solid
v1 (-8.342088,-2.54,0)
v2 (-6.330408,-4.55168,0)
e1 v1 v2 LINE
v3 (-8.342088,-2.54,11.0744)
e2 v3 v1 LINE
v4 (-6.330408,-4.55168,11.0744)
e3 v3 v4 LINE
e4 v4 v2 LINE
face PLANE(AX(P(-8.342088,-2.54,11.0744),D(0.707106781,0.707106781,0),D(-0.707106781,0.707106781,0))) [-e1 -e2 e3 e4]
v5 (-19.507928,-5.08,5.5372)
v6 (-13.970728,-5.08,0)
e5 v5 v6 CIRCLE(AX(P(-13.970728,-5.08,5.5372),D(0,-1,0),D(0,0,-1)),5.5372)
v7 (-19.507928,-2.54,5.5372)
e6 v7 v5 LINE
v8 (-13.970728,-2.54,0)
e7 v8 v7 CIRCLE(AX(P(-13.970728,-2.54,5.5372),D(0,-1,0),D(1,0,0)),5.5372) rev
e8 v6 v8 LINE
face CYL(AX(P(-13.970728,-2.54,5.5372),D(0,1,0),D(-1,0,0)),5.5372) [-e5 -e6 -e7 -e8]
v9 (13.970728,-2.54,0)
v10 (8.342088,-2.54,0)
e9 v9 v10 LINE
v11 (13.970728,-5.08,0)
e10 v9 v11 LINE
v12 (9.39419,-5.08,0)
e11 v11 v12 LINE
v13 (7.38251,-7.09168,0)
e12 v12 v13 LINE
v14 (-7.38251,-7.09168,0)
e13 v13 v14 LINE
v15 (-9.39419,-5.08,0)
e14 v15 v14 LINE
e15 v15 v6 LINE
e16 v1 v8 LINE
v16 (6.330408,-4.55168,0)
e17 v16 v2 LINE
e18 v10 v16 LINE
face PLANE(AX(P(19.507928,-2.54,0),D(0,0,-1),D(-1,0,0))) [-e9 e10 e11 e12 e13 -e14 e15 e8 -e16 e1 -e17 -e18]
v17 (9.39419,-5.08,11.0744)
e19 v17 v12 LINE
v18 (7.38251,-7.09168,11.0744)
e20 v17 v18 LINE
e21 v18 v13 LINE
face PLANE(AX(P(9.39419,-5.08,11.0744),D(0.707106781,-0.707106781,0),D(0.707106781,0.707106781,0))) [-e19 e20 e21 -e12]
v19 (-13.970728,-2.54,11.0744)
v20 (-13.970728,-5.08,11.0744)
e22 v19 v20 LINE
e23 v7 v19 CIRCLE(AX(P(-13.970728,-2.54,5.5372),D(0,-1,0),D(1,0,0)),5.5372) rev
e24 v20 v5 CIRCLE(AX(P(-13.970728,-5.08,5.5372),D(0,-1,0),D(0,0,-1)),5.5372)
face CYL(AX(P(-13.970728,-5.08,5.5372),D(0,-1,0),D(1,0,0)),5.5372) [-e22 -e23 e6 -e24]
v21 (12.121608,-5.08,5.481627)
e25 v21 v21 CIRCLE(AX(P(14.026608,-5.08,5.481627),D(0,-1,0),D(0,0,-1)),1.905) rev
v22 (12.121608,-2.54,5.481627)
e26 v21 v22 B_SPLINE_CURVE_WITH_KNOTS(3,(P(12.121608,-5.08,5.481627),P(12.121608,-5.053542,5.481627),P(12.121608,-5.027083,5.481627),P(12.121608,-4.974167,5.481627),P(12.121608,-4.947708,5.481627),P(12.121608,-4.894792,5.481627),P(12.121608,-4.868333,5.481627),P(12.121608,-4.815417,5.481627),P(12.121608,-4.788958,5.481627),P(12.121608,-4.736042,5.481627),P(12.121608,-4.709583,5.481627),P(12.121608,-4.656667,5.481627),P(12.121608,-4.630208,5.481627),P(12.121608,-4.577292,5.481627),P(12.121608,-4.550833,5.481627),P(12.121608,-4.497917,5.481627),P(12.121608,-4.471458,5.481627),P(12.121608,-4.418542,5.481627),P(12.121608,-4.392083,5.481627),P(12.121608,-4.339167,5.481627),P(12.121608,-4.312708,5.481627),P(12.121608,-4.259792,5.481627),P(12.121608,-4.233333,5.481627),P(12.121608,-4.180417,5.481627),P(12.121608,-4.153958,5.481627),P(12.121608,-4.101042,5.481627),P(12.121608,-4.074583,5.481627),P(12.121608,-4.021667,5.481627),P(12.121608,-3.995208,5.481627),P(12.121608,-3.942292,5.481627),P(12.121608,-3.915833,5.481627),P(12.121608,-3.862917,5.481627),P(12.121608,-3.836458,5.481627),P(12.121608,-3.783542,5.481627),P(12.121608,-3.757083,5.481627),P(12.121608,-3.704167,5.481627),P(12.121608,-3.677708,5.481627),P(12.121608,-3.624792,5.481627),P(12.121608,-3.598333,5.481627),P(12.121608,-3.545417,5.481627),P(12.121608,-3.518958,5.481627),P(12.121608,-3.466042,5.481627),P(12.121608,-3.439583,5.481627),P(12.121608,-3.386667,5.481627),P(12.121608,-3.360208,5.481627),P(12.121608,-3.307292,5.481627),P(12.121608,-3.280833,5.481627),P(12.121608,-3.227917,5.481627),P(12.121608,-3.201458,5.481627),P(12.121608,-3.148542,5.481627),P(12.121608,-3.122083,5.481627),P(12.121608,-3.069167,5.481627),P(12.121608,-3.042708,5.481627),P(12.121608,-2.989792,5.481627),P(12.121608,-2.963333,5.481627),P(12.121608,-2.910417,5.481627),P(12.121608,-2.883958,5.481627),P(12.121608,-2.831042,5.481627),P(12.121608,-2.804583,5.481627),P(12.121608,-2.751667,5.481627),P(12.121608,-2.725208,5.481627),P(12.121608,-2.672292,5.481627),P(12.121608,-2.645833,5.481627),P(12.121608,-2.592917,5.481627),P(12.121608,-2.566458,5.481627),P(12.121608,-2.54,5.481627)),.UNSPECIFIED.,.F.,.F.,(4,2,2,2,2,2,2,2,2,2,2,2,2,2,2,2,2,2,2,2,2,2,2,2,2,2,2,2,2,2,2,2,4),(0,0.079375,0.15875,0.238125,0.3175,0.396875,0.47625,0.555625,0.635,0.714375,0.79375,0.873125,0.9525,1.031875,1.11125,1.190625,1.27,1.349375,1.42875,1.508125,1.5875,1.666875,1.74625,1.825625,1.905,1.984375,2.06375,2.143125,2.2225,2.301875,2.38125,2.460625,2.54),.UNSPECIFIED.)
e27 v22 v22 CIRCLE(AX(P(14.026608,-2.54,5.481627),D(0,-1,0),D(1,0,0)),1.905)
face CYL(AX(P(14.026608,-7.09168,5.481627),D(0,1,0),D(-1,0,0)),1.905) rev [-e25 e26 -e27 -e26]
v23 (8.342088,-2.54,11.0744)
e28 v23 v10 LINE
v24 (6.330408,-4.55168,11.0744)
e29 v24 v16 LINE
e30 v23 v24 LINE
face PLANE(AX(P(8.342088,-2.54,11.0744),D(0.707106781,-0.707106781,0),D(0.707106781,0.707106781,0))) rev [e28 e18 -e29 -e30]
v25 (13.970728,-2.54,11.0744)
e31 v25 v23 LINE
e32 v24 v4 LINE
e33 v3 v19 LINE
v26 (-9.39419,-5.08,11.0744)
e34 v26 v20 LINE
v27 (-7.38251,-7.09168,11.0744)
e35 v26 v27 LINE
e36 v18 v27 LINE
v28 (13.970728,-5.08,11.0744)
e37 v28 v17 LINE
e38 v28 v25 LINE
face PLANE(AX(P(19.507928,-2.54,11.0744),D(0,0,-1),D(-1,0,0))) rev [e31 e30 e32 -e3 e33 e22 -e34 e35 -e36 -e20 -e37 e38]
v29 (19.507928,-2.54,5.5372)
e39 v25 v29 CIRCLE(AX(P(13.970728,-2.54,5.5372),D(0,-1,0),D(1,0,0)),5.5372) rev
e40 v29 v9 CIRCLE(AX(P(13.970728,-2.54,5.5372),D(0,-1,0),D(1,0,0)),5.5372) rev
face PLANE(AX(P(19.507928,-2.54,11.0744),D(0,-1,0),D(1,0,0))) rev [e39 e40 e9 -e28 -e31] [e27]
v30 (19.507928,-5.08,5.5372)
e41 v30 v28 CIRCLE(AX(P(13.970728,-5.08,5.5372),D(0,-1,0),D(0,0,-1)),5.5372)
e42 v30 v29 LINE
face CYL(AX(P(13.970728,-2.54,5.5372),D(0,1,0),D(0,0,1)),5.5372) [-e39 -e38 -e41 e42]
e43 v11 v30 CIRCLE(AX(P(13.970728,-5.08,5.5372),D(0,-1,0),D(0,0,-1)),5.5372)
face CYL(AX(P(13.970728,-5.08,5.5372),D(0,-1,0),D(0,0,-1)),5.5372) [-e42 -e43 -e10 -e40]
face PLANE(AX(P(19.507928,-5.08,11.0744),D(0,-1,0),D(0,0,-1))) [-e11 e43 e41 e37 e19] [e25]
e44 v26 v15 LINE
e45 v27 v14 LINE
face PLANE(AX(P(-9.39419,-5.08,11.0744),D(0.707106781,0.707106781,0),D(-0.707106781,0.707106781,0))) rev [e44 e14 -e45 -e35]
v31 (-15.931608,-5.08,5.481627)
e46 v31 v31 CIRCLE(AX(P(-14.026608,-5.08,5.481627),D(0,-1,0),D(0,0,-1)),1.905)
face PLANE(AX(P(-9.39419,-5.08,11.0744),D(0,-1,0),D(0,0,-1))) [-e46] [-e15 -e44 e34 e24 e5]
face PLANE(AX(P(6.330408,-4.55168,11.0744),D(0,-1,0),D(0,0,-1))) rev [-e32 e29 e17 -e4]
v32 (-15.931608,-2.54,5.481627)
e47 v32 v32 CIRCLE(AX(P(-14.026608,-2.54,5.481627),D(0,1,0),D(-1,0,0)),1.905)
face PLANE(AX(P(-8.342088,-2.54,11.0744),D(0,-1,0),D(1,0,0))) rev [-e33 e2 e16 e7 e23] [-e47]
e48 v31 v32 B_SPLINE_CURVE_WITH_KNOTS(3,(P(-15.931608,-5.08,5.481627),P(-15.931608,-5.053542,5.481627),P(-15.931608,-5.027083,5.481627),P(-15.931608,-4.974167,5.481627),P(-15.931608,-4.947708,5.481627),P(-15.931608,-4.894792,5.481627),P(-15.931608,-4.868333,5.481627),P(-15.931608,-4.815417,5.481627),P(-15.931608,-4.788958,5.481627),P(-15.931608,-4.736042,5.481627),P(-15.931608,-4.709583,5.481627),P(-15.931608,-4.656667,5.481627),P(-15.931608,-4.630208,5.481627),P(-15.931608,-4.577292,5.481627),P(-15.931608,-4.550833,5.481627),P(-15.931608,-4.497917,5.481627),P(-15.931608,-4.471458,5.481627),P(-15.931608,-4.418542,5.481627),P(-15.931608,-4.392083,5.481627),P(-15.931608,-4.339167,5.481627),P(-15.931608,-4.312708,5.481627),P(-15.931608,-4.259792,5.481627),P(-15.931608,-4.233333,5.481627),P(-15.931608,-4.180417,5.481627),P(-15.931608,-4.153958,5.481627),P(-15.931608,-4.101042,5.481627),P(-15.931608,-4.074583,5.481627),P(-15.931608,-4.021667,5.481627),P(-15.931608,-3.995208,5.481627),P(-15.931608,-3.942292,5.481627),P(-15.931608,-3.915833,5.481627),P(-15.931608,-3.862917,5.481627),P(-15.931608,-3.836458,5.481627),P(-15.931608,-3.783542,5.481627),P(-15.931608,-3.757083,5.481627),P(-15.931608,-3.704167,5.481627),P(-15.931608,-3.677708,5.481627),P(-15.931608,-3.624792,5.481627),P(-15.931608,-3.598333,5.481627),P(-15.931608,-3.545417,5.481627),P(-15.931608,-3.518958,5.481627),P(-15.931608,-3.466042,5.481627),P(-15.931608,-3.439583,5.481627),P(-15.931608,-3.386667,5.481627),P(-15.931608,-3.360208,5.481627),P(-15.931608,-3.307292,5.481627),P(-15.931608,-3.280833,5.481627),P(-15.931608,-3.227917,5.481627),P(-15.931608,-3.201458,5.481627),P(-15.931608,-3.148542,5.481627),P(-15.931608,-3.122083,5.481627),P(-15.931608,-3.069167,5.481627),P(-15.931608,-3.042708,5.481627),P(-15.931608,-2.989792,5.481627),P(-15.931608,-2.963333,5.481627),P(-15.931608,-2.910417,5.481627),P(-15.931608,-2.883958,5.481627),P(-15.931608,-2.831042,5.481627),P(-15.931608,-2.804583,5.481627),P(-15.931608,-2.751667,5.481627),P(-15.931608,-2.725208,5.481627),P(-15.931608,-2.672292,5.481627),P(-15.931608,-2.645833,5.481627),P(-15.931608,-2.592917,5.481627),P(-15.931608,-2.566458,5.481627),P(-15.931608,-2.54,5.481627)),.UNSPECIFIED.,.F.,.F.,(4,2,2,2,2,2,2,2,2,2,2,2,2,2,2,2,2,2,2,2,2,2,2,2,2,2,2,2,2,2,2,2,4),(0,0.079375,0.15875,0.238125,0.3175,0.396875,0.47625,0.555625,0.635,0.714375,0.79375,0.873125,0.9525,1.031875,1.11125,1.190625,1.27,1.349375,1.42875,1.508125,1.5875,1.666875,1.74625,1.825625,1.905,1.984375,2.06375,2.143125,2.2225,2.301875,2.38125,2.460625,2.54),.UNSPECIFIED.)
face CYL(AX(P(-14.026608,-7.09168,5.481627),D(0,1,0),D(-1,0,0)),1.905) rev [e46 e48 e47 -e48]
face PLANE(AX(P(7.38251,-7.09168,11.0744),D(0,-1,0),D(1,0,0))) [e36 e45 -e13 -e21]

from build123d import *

# Parameters (mm, degrees)
BASE_EXTRUDE_DEPTH = 11.0744
SKETCH2_R          = 1.905
CUT_EXTRUDE1_DEPTH = 23.889284907
FILLET1_R          = 5.5372


with BuildPart() as part:
    # Sketch1 → Base-Extrude (new body)
    with BuildSketch(Plane.XY):
        Polygon((-8.342087552, -2.54), (-6.330407552, -4.55168), (6.330407552, -4.55168), (8.342087552, -2.54), (19.507927552, -2.54), (19.507927552, -5.08), (9.39419, -5.08), (7.38251, -7.09168), (-7.38251, -7.09168), (-9.39419, -5.08), (-19.507927552, -5.08), (-19.507927552, -2.54), align=None)
    extrude(amount=BASE_EXTRUDE_DEPTH)

    # Sketch2 → Cut-Extrude1 (cut, through all)
    with BuildSketch(Plane(origin=(0, -2.54, 0), x_dir=(-1, 0, 0), z_dir=(0, 1, 0))):
        with Locations((14.026607552, 5.481627302)):
            Circle(SKETCH2_R)
    cut_extrude1 = extrude(amount=-CUT_EXTRUDE1_DEPTH, mode=Mode.SUBTRACT)

    # Mirror1: Cut-Extrude1 across plane
    add(cut_extrude1.mirror(Plane(origin=(0, 0, 0), x_dir=(0, 0, 1), z_dir=(1, 0, 0))), mode=Mode.SUBTRACT)

    # Fillet1
    fillet1_edges = [part.edges().sort_by_distance(p)[0] for p in [
        (19.507927552, -3.81, 0),
        (-19.507927552, -3.81, 0),
        (19.507927552, -3.81, 11.0744),
        (-19.507927552, -3.81, 11.0744),
    ]]
    fillet(fillet1_edges, radius=FILLET1_R - 0.0001)  # a hair under: the kernel refuses the full size


solid = part.part
